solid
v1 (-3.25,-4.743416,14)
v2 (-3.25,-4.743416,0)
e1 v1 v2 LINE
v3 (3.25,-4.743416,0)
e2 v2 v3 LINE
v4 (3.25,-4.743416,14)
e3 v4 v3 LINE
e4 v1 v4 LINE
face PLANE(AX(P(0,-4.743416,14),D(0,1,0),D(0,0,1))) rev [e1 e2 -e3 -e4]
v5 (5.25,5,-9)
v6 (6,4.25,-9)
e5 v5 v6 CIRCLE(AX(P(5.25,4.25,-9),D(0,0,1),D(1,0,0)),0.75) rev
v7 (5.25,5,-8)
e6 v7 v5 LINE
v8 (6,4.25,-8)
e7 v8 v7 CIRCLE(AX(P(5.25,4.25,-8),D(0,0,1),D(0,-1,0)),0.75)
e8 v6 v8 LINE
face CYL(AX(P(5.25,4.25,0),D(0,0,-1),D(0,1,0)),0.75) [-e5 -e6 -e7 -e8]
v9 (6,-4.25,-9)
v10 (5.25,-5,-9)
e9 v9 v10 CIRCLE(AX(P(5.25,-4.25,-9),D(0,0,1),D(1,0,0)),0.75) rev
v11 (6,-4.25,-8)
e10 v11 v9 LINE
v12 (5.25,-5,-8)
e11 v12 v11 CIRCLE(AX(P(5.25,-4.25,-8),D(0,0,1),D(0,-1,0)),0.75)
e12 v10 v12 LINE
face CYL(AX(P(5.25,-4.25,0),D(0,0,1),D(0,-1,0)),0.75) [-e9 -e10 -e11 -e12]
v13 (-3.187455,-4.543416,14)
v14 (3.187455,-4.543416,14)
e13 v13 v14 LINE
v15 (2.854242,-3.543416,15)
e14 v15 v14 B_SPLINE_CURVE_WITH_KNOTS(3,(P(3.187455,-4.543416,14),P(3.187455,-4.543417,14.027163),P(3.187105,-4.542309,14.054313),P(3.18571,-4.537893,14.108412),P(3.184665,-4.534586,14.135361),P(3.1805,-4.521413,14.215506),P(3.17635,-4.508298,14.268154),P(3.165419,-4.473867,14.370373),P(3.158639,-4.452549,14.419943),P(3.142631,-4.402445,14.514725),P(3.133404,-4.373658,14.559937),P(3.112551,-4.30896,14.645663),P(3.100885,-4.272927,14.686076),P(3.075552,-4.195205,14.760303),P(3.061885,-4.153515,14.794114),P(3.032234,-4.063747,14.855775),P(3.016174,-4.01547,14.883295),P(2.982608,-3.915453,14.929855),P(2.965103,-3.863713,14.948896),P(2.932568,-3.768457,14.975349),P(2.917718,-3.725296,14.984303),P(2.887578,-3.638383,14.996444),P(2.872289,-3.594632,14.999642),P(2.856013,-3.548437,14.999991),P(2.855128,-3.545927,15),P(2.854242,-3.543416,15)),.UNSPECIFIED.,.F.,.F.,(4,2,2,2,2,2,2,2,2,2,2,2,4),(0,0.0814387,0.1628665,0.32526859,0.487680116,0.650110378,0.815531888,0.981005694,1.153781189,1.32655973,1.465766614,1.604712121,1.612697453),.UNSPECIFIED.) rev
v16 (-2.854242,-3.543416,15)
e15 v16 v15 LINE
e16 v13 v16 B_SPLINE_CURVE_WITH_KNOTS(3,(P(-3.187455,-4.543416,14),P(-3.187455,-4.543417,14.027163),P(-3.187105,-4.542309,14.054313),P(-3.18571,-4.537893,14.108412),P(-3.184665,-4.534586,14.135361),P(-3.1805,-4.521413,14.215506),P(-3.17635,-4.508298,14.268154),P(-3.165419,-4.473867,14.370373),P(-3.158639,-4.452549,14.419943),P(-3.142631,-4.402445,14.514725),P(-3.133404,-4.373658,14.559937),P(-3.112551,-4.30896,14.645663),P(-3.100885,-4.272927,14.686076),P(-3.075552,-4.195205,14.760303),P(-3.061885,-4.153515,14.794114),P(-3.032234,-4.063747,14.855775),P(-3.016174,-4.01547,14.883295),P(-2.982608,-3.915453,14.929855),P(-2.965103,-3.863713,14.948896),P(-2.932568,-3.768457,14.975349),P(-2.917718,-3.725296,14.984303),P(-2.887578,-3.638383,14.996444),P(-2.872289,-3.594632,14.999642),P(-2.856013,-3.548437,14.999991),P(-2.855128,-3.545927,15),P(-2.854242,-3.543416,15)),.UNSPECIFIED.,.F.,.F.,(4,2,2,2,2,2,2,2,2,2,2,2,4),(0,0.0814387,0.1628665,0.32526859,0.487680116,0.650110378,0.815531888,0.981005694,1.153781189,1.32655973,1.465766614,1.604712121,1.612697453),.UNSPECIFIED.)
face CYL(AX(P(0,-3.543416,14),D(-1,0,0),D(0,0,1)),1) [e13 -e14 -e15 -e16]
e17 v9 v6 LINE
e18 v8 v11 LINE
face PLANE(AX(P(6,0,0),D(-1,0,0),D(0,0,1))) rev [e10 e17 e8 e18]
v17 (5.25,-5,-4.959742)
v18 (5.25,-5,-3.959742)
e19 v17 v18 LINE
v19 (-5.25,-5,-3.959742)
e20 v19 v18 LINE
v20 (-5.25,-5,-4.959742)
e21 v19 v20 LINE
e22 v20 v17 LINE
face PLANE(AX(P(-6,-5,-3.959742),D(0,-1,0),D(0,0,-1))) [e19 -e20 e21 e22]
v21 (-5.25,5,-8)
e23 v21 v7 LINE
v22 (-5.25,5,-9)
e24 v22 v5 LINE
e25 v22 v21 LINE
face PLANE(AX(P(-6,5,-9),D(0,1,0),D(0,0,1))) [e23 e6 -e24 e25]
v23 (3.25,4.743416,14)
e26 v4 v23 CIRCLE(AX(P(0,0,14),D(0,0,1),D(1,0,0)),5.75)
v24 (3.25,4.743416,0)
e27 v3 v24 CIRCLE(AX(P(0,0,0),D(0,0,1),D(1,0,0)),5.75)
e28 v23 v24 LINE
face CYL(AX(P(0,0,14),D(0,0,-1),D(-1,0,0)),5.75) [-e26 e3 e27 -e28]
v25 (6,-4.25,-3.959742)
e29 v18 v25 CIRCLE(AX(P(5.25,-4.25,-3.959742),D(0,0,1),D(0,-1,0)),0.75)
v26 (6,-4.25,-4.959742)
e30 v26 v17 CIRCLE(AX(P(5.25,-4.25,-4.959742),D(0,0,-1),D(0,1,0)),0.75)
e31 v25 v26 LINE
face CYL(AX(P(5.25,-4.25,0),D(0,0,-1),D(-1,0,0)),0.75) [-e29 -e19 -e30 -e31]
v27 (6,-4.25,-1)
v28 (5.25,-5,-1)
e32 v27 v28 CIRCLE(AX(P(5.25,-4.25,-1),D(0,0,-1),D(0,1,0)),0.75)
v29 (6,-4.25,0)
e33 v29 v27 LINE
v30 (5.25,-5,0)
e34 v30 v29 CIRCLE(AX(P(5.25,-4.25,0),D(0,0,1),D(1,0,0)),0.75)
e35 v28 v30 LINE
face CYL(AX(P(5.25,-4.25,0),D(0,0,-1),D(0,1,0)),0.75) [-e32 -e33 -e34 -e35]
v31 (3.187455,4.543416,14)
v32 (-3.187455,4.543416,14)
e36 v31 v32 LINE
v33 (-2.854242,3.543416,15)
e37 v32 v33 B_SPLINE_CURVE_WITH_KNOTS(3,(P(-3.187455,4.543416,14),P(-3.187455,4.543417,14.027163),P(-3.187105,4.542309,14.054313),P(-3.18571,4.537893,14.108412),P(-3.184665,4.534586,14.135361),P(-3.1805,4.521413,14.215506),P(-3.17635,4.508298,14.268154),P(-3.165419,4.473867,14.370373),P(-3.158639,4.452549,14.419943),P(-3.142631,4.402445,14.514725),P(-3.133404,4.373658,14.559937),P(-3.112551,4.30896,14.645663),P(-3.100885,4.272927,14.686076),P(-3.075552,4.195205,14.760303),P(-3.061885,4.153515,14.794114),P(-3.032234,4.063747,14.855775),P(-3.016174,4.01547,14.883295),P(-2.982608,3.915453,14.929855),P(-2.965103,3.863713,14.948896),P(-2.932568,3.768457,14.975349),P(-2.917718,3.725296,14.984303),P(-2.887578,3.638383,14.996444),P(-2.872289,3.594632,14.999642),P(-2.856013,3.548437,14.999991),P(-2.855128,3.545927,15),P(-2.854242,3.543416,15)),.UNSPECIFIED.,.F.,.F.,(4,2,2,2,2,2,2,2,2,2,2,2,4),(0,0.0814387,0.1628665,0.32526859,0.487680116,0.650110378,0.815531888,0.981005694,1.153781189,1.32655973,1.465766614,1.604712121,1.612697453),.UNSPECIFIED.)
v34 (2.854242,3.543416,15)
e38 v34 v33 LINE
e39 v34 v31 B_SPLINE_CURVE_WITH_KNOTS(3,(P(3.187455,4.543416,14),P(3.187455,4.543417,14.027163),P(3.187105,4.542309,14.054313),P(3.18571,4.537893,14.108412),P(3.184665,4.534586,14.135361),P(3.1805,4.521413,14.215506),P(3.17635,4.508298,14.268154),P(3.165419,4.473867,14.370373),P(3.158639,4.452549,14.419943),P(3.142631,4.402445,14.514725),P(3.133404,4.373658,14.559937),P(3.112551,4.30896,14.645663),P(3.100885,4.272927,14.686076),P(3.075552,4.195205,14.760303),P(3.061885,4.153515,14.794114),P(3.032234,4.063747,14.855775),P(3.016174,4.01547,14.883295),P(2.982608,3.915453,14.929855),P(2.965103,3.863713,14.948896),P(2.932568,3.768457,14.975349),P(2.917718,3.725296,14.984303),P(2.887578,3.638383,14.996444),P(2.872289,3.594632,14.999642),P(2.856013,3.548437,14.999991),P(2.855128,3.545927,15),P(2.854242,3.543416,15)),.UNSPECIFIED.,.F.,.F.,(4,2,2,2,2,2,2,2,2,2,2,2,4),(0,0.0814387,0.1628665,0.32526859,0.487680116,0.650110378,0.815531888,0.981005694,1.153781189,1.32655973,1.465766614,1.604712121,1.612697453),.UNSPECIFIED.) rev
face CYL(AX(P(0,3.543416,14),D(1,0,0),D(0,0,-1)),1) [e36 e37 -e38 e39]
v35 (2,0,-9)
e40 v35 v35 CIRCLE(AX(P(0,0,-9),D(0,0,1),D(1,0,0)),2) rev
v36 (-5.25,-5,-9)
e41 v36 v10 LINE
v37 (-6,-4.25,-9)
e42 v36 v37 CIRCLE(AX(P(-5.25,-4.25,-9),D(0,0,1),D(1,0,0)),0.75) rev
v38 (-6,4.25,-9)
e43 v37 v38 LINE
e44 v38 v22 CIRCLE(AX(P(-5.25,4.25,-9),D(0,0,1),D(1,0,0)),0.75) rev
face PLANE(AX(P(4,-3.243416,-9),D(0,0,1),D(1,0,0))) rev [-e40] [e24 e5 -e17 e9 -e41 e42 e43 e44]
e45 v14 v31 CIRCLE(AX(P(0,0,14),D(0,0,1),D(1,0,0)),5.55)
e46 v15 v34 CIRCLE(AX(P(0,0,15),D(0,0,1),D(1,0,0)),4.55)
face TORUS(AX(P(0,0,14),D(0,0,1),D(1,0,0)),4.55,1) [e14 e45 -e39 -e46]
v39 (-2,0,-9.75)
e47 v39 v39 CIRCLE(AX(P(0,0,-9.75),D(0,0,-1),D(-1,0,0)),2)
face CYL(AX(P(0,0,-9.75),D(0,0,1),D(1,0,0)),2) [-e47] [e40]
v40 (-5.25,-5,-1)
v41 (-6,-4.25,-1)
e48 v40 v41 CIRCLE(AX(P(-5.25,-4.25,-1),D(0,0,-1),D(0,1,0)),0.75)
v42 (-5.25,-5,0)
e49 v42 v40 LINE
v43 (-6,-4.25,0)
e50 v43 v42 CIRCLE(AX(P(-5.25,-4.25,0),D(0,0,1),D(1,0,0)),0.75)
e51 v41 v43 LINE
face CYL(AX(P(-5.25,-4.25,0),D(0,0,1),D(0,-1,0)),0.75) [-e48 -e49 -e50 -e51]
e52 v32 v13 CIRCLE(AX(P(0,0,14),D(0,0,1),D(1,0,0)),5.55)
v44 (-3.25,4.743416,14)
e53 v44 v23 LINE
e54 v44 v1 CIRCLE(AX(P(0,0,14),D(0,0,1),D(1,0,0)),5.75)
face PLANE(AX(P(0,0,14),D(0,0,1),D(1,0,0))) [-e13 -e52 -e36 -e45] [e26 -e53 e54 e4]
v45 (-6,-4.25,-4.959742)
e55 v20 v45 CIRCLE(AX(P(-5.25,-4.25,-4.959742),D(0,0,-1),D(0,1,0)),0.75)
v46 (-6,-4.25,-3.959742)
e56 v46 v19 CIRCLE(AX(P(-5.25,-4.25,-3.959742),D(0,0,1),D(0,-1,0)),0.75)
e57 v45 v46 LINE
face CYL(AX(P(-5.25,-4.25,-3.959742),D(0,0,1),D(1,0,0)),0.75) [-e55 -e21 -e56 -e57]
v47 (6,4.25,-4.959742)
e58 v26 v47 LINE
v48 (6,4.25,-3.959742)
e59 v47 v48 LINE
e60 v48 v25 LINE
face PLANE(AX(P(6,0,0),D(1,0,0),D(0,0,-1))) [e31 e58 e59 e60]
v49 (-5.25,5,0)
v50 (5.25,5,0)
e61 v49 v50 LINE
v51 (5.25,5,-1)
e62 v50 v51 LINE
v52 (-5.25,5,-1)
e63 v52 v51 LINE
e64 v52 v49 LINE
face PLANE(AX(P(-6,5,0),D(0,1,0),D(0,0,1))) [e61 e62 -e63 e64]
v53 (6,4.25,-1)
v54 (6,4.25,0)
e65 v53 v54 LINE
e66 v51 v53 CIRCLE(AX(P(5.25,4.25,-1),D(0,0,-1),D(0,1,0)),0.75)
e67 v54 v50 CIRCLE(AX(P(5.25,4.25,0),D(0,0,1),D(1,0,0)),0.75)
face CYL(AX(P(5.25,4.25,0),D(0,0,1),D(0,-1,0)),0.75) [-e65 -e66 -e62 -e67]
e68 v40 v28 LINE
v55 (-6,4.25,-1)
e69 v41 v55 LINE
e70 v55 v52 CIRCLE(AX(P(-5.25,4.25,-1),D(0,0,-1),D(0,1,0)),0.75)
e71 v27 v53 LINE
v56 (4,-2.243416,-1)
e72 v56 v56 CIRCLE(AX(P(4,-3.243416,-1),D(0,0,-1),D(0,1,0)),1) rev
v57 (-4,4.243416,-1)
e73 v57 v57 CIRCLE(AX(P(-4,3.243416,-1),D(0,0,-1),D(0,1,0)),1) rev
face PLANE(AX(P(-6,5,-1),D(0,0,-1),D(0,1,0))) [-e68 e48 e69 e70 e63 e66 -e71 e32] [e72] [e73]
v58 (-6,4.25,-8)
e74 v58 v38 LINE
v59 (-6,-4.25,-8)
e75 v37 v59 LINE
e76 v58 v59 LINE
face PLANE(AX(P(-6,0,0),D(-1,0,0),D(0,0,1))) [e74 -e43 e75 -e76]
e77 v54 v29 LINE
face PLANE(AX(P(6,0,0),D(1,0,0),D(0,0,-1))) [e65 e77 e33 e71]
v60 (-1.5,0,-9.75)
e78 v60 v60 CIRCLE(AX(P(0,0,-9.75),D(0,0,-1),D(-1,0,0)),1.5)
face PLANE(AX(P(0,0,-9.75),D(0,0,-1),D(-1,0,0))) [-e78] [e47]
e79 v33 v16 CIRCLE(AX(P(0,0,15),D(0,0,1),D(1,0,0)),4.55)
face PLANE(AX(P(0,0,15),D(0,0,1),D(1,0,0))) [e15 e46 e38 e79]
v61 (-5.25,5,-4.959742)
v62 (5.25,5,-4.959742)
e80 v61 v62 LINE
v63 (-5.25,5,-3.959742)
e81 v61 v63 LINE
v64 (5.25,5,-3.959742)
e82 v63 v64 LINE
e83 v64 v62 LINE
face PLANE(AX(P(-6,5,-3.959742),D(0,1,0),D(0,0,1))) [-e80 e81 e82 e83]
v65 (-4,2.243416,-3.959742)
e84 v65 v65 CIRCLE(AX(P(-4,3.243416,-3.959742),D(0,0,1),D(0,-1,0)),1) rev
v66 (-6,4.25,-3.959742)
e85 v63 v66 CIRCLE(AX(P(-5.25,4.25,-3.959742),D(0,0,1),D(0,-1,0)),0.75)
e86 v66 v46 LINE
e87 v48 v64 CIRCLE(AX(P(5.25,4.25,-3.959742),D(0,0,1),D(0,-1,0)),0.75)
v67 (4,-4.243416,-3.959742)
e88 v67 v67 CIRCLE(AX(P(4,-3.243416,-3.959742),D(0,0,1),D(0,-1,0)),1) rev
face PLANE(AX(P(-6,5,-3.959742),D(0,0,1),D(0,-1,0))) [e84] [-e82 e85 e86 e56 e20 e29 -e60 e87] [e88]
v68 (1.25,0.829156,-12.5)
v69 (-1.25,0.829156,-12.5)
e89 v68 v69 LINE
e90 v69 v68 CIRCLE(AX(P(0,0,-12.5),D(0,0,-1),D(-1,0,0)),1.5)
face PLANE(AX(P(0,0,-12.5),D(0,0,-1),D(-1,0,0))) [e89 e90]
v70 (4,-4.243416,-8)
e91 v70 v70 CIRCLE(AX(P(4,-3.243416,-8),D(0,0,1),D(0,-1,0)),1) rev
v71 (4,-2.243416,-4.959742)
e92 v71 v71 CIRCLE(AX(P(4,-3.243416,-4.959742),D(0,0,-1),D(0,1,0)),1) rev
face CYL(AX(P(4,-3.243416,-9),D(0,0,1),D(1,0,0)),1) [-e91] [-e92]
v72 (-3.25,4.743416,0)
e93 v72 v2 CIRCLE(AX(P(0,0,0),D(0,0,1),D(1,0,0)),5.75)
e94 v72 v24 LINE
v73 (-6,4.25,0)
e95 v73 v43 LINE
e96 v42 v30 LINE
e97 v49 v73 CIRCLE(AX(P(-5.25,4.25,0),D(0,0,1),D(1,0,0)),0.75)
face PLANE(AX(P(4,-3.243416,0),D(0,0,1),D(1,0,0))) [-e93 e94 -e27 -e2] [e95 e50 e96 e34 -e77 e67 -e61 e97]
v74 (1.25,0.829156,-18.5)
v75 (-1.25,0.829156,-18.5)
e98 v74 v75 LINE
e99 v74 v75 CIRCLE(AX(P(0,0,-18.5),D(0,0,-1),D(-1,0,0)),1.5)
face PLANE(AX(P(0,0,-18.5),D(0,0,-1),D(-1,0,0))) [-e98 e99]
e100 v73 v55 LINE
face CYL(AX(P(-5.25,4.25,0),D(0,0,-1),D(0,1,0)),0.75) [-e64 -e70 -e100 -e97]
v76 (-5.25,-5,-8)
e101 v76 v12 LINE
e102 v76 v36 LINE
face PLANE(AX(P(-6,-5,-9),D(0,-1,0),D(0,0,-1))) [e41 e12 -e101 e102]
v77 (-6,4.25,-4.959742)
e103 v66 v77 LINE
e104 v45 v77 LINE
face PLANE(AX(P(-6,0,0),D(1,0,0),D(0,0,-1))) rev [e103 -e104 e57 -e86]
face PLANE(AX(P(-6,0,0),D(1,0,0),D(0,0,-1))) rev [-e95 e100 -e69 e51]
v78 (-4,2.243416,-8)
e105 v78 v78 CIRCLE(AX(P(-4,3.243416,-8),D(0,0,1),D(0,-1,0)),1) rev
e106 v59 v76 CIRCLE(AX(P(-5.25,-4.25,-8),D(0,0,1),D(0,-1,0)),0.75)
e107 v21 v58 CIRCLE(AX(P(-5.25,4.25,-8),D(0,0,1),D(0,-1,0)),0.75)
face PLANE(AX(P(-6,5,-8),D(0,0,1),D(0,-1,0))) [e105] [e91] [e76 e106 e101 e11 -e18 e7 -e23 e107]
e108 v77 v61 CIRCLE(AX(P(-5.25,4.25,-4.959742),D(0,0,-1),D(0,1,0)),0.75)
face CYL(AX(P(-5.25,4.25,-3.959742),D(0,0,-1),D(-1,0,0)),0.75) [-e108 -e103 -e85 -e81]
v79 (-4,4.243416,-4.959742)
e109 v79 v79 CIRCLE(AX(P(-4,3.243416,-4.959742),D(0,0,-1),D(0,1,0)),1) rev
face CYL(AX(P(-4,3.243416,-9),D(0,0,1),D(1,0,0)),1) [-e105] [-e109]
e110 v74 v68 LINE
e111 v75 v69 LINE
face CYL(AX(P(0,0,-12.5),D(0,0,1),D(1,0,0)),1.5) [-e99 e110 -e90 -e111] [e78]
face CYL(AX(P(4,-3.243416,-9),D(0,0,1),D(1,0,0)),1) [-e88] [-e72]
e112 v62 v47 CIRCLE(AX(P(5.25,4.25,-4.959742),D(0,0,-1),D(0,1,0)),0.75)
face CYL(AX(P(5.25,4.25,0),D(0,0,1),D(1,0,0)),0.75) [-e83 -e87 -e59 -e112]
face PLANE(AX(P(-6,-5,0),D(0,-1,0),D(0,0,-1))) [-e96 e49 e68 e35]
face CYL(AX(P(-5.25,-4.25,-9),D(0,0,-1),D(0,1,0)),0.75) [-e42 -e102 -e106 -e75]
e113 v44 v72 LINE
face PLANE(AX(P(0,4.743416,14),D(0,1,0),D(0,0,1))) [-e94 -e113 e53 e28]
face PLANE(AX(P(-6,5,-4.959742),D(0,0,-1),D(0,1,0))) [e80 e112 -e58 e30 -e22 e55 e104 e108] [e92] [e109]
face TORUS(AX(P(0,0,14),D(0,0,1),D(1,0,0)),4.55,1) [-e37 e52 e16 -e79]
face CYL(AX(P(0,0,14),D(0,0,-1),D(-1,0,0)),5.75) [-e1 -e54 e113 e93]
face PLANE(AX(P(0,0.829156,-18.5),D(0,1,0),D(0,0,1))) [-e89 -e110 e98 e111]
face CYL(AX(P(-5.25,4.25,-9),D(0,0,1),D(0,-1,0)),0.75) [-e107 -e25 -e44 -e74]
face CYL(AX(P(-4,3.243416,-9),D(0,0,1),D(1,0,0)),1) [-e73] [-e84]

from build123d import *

# Parameters (mm, degrees)
BOSS_EXTRUDE1_DEPTH      = 14
SKETCH2_R                = 1
BOSS_EXTRUDE2_DEPTH      = 9
BOSS_EXTRUDE3_DEPTH      = 6
BOSS_EXTRUDE3_DEPTH_BACK = 6
SKETCH3_W                = 1
SKETCH3_H                = 10
SKETCH4_R                = 2
SKETCH4_R_2              = 1.5
BOSS_EXTRUDE4_DEPTH      = 0.75
SKETCH5_R                = 1.5
BOSS_EXTRUDE5_DEPTH      = 3.5
BOSS_EXTRUDE6_DEPTH      = 6
BOSS_EXTRUDE7_DEPTH      = 1
FILLET1_R                = 1
FILLET2_R                = 0.75


with BuildPart() as part:
    # Sketch1 → Boss-Extrude1 (new body)
    with BuildSketch(Plane.XY):
        with BuildLine():
            Line((3.25, 4.74341649), (-3.25, 4.74341649))
            ThreePointArc((-3.25, 4.74341649), (-5.086747487, 2.680951324), (-5.75, 0))
            Line((-5.75, 0), (5.75, 0))
            ThreePointArc((5.75, 0), (5.086747487, 2.680951324), (3.25, 4.74341649))
        make_face()
        with BuildLine():
            Line((5.75, 0), (-5.75, 0))
            ThreePointArc((-5.75, 0), (-5.086747487, -2.680951324), (-3.25, -4.74341649))
            Line((-3.25, -4.74341649), (3.25, -4.74341649))
            ThreePointArc((3.25, -4.74341649), (5.086747487, -2.680951324), (5.75, 0))
        make_face()
    extrude(amount=BOSS_EXTRUDE1_DEPTH)

    # Sketch2 → Boss-Extrude2 (add)
    with BuildSketch(Plane.XY):
        with Locations((4, -3.24341649)):
            Circle(SKETCH2_R)
        with Locations((-4, 3.24341649)):
            Circle(SKETCH2_R)
    extrude(amount=-BOSS_EXTRUDE2_DEPTH)

    # Sketch3 → Boss-Extrude3 (add, two sides: drawn at the far end of the back side and taken through both)
    with BuildSketch(Plane(origin=(0, 0, 0), x_dir=(0, 0, -1), z_dir=(1, 0, 0)).offset(-BOSS_EXTRUDE3_DEPTH_BACK)):
        with Locations((0.5, 0)):
            Rectangle(SKETCH3_W, SKETCH3_H)
        with Locations((4.459742397, 0)):
            Rectangle(SKETCH3_W, SKETCH3_H)
        with Locations((8.5, 0)):
            Rectangle(SKETCH3_W, SKETCH3_H)
    extrude(amount=BOSS_EXTRUDE3_DEPTH + BOSS_EXTRUDE3_DEPTH_BACK)

    # Sketch4 → Boss-Extrude4 (add)
    with BuildSketch(Plane(origin=(0, 0, -9), x_dir=(-1, 0, 0), z_dir=(0, 0, -1))):
        with Locations(Location((0, 0, 0), (0, 0, 180))):
            Circle(SKETCH4_R)
        Circle(SKETCH4_R_2, mode=Mode.SUBTRACT)
    extrude(amount=BOSS_EXTRUDE4_DEPTH)

    # Sketch5 → Boss-Extrude5 (add)
    with BuildSketch(Plane(origin=(0, 0, -9), x_dir=(-1, 0, 0), z_dir=(0, 0, -1))):
        Circle(SKETCH5_R)
    extrude(amount=BOSS_EXTRUDE5_DEPTH)

    # Sketch6 → Boss-Extrude6 (add)
    with BuildSketch(Plane(origin=(0, 0, -12.5), x_dir=(-1, 0, 0), z_dir=(0, 0, -1))):
        with BuildLine():
            Line((1.25, 0.829156198), (-1.25, 0.829156198))
            ThreePointArc((-1.25, 0.829156198), (-0.433012702, -1.436140662), (1.5, 0))
            ThreePointArc((1.5, 0), (1.436140662, 0.433012702), (1.25, 0.829156198))
        make_face()
    extrude(amount=BOSS_EXTRUDE6_DEPTH)

    # Sketch7 → Boss-Extrude7 (add)
    with BuildSketch(Plane.XY.offset(14)):
        with BuildLine():
            Line((-3.187454564, -4.54341649), (3.187454564, -4.54341649))
            ThreePointArc((3.187454564, -4.54341649), (5.55, 0), (3.187454564, 4.54341649))
            Line((3.187454564, 4.54341649), (-3.187454564, 4.54341649))
            ThreePointArc((-3.187454564, 4.54341649), (-5.55, 0), (-3.187454564, -4.54341649))
        make_face()
    extrude(amount=BOSS_EXTRUDE7_DEPTH)

    # Fillet1
    fillet1_edges = [part.edges().sort_by_distance(p)[0] for p in [
        (0, 4.54341649, 15),
        (5.55, 0, 15),
        (0, -4.54341649, 15),
        (-5.55, 0, 15),
    ]]
    fillet(fillet1_edges, radius=FILLET1_R - 0.0001)  # a hair under: the kernel refuses the full size

    # Fillet2
    fillet2_edges = [part.edges().sort_by_distance(p)[0] for p in [
        (-6, 5, -0.5),
        (-6, -5, -0.5),
        (6, -5, -0.5),
        (6, 5, -0.5),
        (-6, 5, -4.459742397),
        (-6, -5, -4.459742397),
        (6, -5, -4.459742397),
        (6, 5, -4.459742397),
        (-6, -5, -8.5),
        (-6, 5, -8.5),
        (6, 5, -8.5),
        (6, -5, -8.5),
    ]]
    fillet(fillet2_edges, radius=FILLET2_R)


solid = part.part
